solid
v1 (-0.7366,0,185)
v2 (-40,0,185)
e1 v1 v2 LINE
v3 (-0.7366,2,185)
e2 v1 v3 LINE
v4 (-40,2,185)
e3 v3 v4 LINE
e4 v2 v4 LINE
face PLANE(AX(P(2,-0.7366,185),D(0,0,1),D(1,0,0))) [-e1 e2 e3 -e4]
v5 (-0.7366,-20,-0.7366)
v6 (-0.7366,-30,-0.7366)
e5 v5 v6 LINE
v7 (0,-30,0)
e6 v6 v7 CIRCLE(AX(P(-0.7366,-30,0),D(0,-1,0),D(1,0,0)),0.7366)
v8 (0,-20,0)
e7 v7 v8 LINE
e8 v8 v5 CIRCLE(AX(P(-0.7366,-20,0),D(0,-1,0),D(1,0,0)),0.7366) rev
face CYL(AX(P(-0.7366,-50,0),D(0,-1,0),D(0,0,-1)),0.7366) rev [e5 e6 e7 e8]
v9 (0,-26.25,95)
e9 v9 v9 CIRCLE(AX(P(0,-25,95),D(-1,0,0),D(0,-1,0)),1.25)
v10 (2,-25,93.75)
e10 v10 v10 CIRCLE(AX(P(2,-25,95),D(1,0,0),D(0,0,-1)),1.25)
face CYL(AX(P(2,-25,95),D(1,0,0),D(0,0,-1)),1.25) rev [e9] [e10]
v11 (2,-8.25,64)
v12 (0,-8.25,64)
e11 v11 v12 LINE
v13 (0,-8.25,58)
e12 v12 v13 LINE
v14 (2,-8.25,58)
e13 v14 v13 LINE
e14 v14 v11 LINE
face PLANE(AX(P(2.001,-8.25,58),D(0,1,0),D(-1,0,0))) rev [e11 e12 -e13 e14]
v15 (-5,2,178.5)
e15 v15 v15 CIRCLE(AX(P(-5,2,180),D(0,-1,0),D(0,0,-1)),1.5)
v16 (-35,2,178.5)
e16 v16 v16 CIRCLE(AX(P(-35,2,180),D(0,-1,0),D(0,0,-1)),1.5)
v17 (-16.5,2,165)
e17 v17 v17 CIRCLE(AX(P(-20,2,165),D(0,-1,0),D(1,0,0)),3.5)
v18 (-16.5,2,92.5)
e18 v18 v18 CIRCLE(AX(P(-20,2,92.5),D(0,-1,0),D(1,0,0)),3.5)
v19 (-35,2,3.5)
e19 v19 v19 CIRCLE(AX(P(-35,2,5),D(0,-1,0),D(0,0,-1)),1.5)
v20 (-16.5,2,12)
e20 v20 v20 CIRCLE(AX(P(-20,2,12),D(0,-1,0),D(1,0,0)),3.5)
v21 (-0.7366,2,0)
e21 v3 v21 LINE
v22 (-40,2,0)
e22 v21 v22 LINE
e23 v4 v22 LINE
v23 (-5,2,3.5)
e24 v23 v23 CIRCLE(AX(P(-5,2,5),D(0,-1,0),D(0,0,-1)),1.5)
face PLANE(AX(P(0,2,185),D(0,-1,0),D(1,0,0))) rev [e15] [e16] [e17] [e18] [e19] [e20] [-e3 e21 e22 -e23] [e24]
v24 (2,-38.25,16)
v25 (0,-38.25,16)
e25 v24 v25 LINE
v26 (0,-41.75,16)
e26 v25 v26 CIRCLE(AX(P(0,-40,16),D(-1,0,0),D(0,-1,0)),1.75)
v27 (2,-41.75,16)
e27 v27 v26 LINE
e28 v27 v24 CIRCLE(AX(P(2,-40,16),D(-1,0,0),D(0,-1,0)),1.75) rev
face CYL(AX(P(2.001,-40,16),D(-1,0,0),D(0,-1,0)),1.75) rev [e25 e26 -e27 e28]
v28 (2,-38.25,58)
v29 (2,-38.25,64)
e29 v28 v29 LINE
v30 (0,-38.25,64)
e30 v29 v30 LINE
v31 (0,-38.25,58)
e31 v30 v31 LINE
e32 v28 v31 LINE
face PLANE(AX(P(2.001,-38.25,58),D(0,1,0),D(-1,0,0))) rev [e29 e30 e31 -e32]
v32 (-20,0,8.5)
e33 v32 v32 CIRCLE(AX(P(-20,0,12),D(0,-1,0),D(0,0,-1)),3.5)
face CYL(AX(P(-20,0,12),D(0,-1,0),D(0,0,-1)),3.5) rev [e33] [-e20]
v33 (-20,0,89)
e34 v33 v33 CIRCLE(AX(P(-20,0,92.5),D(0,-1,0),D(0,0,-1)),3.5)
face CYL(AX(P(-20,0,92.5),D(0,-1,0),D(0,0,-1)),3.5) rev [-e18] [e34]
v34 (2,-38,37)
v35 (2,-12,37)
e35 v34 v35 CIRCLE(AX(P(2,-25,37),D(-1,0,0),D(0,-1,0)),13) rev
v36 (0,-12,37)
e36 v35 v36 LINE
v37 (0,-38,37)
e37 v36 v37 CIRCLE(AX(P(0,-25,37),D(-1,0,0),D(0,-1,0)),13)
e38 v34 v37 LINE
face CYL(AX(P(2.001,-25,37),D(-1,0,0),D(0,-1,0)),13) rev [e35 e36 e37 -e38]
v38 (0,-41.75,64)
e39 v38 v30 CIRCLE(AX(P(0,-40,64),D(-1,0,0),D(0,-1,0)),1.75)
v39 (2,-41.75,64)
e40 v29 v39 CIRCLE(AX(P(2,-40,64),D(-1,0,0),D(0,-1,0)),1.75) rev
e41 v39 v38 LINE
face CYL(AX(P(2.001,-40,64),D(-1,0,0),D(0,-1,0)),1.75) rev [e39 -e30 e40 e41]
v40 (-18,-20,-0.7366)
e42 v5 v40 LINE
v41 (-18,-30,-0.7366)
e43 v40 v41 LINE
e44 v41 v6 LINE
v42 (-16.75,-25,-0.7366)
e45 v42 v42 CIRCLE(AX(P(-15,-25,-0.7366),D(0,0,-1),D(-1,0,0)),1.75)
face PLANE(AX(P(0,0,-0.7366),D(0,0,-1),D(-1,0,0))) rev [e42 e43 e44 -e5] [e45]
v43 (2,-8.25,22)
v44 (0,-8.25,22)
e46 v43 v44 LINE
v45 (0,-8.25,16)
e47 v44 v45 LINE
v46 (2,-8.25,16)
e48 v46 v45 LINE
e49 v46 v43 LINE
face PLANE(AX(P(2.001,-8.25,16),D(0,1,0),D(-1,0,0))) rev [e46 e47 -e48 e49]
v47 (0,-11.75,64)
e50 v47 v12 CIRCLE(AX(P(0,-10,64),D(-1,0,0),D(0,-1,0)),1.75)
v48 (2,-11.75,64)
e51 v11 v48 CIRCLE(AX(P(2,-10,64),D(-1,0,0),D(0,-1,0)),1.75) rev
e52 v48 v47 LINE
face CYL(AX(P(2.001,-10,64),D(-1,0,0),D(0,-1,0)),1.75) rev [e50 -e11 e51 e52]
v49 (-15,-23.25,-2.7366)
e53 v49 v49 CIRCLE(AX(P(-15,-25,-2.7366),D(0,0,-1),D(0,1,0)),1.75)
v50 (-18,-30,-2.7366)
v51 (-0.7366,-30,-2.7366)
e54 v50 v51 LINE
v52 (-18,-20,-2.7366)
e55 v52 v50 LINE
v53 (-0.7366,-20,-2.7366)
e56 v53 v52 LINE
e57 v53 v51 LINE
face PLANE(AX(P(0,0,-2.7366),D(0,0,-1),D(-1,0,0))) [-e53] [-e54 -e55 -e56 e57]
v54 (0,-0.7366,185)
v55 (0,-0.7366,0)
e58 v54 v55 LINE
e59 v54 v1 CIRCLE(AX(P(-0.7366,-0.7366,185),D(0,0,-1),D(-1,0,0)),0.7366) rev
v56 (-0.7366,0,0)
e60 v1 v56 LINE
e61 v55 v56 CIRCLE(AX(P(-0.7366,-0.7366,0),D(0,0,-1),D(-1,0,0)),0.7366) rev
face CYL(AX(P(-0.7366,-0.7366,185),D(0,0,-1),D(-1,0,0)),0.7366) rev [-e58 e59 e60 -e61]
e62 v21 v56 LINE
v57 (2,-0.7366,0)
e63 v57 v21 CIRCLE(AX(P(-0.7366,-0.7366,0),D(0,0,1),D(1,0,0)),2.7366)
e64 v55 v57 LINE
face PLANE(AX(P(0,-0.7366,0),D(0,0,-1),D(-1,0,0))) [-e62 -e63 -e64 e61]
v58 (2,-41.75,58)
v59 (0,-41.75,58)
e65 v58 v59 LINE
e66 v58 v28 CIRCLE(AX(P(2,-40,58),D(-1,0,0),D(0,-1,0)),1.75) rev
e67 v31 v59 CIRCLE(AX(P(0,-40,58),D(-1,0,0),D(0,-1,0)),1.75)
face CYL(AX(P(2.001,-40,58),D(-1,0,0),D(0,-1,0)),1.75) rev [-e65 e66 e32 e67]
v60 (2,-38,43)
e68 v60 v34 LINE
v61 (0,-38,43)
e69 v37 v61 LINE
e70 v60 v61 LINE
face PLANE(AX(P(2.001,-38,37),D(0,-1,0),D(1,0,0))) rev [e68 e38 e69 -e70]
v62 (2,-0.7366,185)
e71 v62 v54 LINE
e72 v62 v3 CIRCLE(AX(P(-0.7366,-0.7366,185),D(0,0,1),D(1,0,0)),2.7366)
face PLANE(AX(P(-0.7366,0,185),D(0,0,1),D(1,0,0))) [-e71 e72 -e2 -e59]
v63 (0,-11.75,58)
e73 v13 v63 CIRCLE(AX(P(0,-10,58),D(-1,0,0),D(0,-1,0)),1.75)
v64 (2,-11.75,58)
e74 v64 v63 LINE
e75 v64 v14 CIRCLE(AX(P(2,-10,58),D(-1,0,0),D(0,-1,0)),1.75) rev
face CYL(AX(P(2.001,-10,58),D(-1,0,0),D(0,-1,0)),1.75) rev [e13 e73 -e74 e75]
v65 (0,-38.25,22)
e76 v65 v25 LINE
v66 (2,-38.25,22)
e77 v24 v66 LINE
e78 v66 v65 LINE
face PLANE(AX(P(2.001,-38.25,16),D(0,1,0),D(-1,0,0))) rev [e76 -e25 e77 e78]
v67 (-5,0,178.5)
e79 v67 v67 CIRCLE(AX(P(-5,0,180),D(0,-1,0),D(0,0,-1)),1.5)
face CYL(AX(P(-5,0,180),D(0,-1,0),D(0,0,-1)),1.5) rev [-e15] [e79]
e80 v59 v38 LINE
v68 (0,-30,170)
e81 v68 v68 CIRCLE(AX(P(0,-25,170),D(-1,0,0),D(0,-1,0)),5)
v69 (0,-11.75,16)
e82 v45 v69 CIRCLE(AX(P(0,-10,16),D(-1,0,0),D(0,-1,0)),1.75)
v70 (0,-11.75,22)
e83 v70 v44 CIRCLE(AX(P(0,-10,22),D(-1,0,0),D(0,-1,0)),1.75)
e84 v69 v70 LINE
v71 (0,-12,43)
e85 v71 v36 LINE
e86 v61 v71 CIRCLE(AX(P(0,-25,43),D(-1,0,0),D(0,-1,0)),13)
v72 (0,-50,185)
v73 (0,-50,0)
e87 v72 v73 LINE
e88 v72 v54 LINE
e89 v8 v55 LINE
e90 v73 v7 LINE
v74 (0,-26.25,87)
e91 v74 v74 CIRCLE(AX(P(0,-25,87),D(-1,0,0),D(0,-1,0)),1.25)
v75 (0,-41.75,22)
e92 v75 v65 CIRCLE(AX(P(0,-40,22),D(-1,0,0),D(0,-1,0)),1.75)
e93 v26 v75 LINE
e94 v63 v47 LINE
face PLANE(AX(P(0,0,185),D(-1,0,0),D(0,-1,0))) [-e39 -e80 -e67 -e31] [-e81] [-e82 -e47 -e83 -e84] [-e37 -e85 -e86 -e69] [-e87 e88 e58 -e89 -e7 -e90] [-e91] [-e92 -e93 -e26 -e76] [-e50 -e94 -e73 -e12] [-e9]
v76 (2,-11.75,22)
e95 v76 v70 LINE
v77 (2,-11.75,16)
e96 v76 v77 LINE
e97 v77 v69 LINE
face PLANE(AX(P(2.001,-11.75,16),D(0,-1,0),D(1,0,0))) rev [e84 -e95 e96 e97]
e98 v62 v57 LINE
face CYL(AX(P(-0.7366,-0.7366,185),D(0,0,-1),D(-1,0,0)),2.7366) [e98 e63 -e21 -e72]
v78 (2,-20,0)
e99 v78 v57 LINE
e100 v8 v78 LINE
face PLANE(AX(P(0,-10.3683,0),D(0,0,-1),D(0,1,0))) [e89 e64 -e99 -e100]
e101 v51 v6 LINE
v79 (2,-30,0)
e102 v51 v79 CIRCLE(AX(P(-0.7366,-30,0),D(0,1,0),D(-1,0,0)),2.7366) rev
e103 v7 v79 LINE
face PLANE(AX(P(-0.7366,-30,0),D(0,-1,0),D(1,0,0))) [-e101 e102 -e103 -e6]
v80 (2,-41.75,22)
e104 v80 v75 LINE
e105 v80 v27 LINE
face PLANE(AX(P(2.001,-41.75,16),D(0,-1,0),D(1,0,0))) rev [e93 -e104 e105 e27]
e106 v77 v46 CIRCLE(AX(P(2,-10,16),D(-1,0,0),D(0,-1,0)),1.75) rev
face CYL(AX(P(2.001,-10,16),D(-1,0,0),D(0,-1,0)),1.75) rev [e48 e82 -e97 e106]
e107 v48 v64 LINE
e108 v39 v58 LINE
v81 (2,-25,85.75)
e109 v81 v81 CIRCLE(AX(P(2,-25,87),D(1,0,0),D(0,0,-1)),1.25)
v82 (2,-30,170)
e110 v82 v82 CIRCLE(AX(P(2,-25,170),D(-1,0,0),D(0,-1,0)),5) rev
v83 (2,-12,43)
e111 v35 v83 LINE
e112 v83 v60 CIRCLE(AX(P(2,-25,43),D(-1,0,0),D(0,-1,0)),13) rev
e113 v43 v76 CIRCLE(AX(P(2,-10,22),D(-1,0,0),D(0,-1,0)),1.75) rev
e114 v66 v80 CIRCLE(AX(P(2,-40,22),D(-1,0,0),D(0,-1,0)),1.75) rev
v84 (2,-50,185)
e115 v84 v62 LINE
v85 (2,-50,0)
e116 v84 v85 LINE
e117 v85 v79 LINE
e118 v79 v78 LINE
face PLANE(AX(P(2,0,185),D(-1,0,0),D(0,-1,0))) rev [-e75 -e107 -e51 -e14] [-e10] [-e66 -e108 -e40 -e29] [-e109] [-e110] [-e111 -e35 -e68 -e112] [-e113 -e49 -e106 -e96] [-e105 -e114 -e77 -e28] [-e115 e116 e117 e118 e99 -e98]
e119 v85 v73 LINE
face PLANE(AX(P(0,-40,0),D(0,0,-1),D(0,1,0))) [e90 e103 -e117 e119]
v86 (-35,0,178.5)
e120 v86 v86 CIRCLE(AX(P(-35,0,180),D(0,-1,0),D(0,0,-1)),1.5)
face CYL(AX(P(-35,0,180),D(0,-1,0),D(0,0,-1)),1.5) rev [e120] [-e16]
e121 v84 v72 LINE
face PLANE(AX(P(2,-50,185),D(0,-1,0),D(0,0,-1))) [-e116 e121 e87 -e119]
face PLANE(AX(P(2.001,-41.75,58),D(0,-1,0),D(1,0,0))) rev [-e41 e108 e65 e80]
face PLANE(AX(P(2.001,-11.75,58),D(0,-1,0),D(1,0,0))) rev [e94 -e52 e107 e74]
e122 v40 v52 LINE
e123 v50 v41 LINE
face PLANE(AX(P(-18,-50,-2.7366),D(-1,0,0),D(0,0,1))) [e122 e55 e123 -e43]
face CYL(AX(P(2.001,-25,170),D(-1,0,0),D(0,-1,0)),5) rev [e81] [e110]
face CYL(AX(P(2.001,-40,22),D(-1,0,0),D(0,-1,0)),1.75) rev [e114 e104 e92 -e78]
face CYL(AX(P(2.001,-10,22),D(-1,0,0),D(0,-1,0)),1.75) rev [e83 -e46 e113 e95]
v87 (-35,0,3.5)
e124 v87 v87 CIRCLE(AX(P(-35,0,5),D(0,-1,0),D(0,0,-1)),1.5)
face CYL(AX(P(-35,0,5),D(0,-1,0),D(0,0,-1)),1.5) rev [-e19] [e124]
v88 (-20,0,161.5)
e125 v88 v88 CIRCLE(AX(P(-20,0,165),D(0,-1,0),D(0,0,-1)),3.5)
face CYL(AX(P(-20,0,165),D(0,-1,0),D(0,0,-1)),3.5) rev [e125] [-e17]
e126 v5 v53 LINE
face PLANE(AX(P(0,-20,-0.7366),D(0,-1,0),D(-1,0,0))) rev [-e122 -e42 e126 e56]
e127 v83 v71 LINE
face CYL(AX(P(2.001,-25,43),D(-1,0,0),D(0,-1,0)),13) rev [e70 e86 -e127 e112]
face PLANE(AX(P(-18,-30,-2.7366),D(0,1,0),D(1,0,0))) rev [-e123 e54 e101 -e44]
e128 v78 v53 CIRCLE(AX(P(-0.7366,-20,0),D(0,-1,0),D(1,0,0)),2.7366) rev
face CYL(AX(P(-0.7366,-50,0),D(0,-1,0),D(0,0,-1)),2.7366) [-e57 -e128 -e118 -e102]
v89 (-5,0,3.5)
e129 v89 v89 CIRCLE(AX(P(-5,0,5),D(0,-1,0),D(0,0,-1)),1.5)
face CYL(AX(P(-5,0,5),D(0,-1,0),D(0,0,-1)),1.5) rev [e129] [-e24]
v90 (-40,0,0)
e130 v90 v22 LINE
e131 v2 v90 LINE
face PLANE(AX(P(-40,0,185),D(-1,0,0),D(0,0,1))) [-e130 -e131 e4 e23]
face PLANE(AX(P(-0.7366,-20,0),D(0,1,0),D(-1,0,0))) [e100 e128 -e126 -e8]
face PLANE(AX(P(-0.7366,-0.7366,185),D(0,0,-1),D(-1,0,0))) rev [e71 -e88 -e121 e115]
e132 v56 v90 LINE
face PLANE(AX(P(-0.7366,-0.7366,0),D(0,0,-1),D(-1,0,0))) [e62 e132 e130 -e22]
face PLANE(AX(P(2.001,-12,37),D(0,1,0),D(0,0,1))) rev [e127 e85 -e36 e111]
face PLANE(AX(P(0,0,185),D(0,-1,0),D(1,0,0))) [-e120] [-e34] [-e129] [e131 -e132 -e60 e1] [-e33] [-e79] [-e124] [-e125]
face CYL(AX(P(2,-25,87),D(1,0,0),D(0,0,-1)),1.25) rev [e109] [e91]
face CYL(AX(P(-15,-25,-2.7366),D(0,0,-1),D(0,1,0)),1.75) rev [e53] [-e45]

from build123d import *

# Parameters (mm, degrees)
SM_BASE_FLANGE_1_DEPTH    = 185
CUT_EXTRUDE_1_REACH       = 197.768
SKETCH_6_R                = 5
SM_EDGE_FLANGE_1_DEPTH    = 49.2634
HOLE_WIZARD_M3_2_D        = 3
CUT_EXTRUDE_START         = -2.7366
CUT_EXTRUDE_6_OUTLINE_W   = 21
CUT_EXTRUDE_6_OUTLINE_H   = 20
CUT_EXTRUDE_6_OUTLINE_H_2 = 19.2634
CUT_EXTRUDE_6_DEPTH       = 2.7366
HOLE_WIZARD_3_5_3_5_1_D   = 3.5
HOLE_WIZARD_7_0_7_1_D     = 7
HOLE_WIZARD_7_0_7_1_DEPTH = 6
HOLE_WIZARD_7_0_7_1_TIP   = 2.103012167
M3X0_5_1_D                = 2.5


# Read off the part's stored shape, not the designer's step: 除料-伸長6
# Sheet-metal steps are written as plain solids
with BuildPart() as part:
    # Sketch 1 → 基材-凸緣1 (new body)
    with BuildSketch(Plane.XY):
        with BuildLine():
            Line((0, -50), (0, -0.7366))
            ThreePointArc((0, -0.7366), (-0.215745145, -0.215745145), (-0.7366, 0))
            Line((-0.7366, 0), (-40, 0))
            Line((-40, 0), (-40, 2))
            Line((-40, 2), (-0.7366, 2))
            ThreePointArc((-0.7366, 2), (1.198468417, 1.198468417), (2, -0.7366))
            Line((2, -0.7366), (2, -50))
            Line((2, -50), (0, -50))
        make_face()
    extrude(amount=SM_BASE_FLANGE_1_DEPTH)

    # 草圖6 → 除料-伸長1 (cut, up to next)
    with BuildSketch(Plane.ZY, mode=Mode.PRIVATE) as cut_extrude_1_sk1:
        with Locations(Location((170, -25, 0), (0, 0, 270))):
            Circle(SKETCH_6_R)
    cut_extrude_1_tool1 = extrude(cut_extrude_1_sk1.sketch, amount=-CUT_EXTRUDE_1_REACH, mode=Mode.PRIVATE) & part.part
    # 草圖6 → 除料-伸長1 (cut, up to next)
    with BuildSketch(Plane.ZY, mode=Mode.PRIVATE) as cut_extrude_1_sk2:
        with BuildLine():
            Line((37, -12), (43, -12))
            ThreePointArc((43, -12), (56, -25), (43, -38))
            Line((43, -38), (37, -38))
            ThreePointArc((37, -38), (24, -25), (37, -12))
        make_face()
    cut_extrude_1_tool2 = extrude(cut_extrude_1_sk2.sketch, amount=-CUT_EXTRUDE_1_REACH, mode=Mode.PRIVATE) & part.part
    # 草圖6 → 除料-伸長1 (cut, up to next)
    with BuildSketch(Plane.ZY, mode=Mode.PRIVATE) as cut_extrude_1_sk3:
        with BuildLine():
            Line((58, -8.25), (64, -8.25))
            ThreePointArc((64, -8.25), (65.75, -10), (64, -11.75))
            Line((64, -11.75), (58, -11.75))
            ThreePointArc((58, -11.75), (56.25, -10), (58, -8.25))
        make_face()
    cut_extrude_1_tool3 = extrude(cut_extrude_1_sk3.sketch, amount=-CUT_EXTRUDE_1_REACH, mode=Mode.PRIVATE) & part.part
    # 草圖6 → 除料-伸長1 (cut, up to next)
    with BuildSketch(Plane.ZY, mode=Mode.PRIVATE) as cut_extrude_1_sk4:
        with BuildLine():
            Line((16, -8.25), (22, -8.25))
            ThreePointArc((22, -8.25), (23.75, -10), (22, -11.75))
            Line((22, -11.75), (16, -11.75))
            ThreePointArc((16, -11.75), (14.25, -10), (16, -8.25))
        make_face()
    cut_extrude_1_tool4 = extrude(cut_extrude_1_sk4.sketch, amount=-CUT_EXTRUDE_1_REACH, mode=Mode.PRIVATE) & part.part
    # 草圖6 → 除料-伸長1 (cut, up to next)
    with BuildSketch(Plane.ZY, mode=Mode.PRIVATE) as cut_extrude_1_sk5:
        with BuildLine():
            Line((16, -38.25), (22, -38.25))
            ThreePointArc((22, -38.25), (23.75, -40), (22, -41.75))
            Line((22, -41.75), (16, -41.75))
            ThreePointArc((16, -41.75), (14.25, -40), (16, -38.25))
        make_face()
    cut_extrude_1_tool5 = extrude(cut_extrude_1_sk5.sketch, amount=-CUT_EXTRUDE_1_REACH, mode=Mode.PRIVATE) & part.part
    # 草圖6 → 除料-伸長1 (cut, up to next)
    with BuildSketch(Plane.ZY, mode=Mode.PRIVATE) as cut_extrude_1_sk6:
        with BuildLine():
            Line((58, -38.25), (64, -38.25))
            ThreePointArc((64, -38.25), (65.75, -40), (64, -41.75))
            Line((64, -41.75), (58, -41.75))
            ThreePointArc((58, -41.75), (56.25, -40), (58, -38.25))
        make_face()
    cut_extrude_1_tool6 = extrude(cut_extrude_1_sk6.sketch, amount=-CUT_EXTRUDE_1_REACH, mode=Mode.PRIVATE) & part.part
    add(cut_extrude_1_tool1.solids().sort_by_distance((0, -25, 170))[0], mode=Mode.SUBTRACT)
    add(cut_extrude_1_tool2.solids().sort_by_distance((0, -25, 40))[0], mode=Mode.SUBTRACT)
    add(cut_extrude_1_tool3.solids().sort_by_distance((0, -10, 61))[0], mode=Mode.SUBTRACT)
    add(cut_extrude_1_tool4.solids().sort_by_distance((0, -10, 19))[0], mode=Mode.SUBTRACT)
    add(cut_extrude_1_tool5.solids().sort_by_distance((0, -40, 19))[0], mode=Mode.SUBTRACT)
    add(cut_extrude_1_tool6.solids().sort_by_distance((0, -40, 61))[0], mode=Mode.SUBTRACT)

    # 邊線-凸緣1 section (across the edge) → 邊線-凸緣1 (add)
    with BuildSketch(Plane(origin=(0, -0.7366, -0.7366), x_dir=(0, 0, 1), z_dir=(0, -1, 0))):
        with BuildLine():
            Line((-2, 0.7366), (-2, 18))
            Line((-2, 18), (0, 18))
            Line((0, 18), (0, 0.7366))
            ThreePointArc((0, 0.7366), (0.215745145, 0.215745145), (0.7366, 0))
            Line((0.7366, 0), (0.7366, -2))
            ThreePointArc((0.7366, -2), (-1.198468417, -1.198468417), (-2, 0.7366))
        make_face()
    extrude(amount=SM_EDGE_FLANGE_1_DEPTH)

    # M3 螺紋孔2 (through all)
    with Locations(Plane(origin=(0, 0, 0), x_dir=(-1, 0, 0), z_dir=(0, -1, 0))):
        with Locations((35, -5), (35, -180), (5, -5), (5, -180)):
            Hole(HOLE_WIZARD_M3_2_D / 2)

    # 除料-伸長6 outline → 除料-伸長6 (cut)
    with BuildSketch(Plane(origin=(0, 0, -2.7366), x_dir=(-1, 0, 0), z_dir=(0, 0, -1)).offset(CUT_EXTRUDE_START)):
        with Locations((7.5, -40)):
            Rectangle(CUT_EXTRUDE_6_OUTLINE_W, CUT_EXTRUDE_6_OUTLINE_H)
        with Locations((7.5, -10.3683)):
            Rectangle(CUT_EXTRUDE_6_OUTLINE_W, CUT_EXTRUDE_6_OUTLINE_H_2)
    extrude(amount=CUT_EXTRUDE_6_DEPTH, mode=Mode.SUBTRACT)

    # Ø3.5 (3.5) 直徑孔1 (through all)
    with Locations(Plane(origin=(0, 0, -2.7366), x_dir=(-1, 0, 0), z_dir=(0, 0, -1))):
        with Locations((15, -25)):
            Hole(HOLE_WIZARD_3_5_3_5_1_D / 2)

    # Ø7.0 (7) 直徑孔1
    with Locations(Plane(origin=(0, 0, 0), x_dir=(-1, 0, 0), z_dir=(0, -1, 0))):
        with Locations((20, -165), (20, -92.5), (20, -12)):
            Hole(HOLE_WIZARD_7_0_7_1_D / 2, depth=HOLE_WIZARD_7_0_7_1_DEPTH)
            with Locations((0, 0, -(HOLE_WIZARD_7_0_7_1_DEPTH + HOLE_WIZARD_7_0_7_1_TIP / 2))):  # 118° drill point
                Cone(0, HOLE_WIZARD_7_0_7_1_D / 2, HOLE_WIZARD_7_0_7_1_TIP, mode=Mode.SUBTRACT)

    # M3x0.5 螺紋孔1 (through all)
    with Locations(Plane(origin=(2, 0, 0), x_dir=(0, 0, -1), z_dir=(1, 0, 0))):
        with Locations((-95, -25), (-87, -25)):
            Hole(M3X0_5_1_D / 2)


solid = part.part
